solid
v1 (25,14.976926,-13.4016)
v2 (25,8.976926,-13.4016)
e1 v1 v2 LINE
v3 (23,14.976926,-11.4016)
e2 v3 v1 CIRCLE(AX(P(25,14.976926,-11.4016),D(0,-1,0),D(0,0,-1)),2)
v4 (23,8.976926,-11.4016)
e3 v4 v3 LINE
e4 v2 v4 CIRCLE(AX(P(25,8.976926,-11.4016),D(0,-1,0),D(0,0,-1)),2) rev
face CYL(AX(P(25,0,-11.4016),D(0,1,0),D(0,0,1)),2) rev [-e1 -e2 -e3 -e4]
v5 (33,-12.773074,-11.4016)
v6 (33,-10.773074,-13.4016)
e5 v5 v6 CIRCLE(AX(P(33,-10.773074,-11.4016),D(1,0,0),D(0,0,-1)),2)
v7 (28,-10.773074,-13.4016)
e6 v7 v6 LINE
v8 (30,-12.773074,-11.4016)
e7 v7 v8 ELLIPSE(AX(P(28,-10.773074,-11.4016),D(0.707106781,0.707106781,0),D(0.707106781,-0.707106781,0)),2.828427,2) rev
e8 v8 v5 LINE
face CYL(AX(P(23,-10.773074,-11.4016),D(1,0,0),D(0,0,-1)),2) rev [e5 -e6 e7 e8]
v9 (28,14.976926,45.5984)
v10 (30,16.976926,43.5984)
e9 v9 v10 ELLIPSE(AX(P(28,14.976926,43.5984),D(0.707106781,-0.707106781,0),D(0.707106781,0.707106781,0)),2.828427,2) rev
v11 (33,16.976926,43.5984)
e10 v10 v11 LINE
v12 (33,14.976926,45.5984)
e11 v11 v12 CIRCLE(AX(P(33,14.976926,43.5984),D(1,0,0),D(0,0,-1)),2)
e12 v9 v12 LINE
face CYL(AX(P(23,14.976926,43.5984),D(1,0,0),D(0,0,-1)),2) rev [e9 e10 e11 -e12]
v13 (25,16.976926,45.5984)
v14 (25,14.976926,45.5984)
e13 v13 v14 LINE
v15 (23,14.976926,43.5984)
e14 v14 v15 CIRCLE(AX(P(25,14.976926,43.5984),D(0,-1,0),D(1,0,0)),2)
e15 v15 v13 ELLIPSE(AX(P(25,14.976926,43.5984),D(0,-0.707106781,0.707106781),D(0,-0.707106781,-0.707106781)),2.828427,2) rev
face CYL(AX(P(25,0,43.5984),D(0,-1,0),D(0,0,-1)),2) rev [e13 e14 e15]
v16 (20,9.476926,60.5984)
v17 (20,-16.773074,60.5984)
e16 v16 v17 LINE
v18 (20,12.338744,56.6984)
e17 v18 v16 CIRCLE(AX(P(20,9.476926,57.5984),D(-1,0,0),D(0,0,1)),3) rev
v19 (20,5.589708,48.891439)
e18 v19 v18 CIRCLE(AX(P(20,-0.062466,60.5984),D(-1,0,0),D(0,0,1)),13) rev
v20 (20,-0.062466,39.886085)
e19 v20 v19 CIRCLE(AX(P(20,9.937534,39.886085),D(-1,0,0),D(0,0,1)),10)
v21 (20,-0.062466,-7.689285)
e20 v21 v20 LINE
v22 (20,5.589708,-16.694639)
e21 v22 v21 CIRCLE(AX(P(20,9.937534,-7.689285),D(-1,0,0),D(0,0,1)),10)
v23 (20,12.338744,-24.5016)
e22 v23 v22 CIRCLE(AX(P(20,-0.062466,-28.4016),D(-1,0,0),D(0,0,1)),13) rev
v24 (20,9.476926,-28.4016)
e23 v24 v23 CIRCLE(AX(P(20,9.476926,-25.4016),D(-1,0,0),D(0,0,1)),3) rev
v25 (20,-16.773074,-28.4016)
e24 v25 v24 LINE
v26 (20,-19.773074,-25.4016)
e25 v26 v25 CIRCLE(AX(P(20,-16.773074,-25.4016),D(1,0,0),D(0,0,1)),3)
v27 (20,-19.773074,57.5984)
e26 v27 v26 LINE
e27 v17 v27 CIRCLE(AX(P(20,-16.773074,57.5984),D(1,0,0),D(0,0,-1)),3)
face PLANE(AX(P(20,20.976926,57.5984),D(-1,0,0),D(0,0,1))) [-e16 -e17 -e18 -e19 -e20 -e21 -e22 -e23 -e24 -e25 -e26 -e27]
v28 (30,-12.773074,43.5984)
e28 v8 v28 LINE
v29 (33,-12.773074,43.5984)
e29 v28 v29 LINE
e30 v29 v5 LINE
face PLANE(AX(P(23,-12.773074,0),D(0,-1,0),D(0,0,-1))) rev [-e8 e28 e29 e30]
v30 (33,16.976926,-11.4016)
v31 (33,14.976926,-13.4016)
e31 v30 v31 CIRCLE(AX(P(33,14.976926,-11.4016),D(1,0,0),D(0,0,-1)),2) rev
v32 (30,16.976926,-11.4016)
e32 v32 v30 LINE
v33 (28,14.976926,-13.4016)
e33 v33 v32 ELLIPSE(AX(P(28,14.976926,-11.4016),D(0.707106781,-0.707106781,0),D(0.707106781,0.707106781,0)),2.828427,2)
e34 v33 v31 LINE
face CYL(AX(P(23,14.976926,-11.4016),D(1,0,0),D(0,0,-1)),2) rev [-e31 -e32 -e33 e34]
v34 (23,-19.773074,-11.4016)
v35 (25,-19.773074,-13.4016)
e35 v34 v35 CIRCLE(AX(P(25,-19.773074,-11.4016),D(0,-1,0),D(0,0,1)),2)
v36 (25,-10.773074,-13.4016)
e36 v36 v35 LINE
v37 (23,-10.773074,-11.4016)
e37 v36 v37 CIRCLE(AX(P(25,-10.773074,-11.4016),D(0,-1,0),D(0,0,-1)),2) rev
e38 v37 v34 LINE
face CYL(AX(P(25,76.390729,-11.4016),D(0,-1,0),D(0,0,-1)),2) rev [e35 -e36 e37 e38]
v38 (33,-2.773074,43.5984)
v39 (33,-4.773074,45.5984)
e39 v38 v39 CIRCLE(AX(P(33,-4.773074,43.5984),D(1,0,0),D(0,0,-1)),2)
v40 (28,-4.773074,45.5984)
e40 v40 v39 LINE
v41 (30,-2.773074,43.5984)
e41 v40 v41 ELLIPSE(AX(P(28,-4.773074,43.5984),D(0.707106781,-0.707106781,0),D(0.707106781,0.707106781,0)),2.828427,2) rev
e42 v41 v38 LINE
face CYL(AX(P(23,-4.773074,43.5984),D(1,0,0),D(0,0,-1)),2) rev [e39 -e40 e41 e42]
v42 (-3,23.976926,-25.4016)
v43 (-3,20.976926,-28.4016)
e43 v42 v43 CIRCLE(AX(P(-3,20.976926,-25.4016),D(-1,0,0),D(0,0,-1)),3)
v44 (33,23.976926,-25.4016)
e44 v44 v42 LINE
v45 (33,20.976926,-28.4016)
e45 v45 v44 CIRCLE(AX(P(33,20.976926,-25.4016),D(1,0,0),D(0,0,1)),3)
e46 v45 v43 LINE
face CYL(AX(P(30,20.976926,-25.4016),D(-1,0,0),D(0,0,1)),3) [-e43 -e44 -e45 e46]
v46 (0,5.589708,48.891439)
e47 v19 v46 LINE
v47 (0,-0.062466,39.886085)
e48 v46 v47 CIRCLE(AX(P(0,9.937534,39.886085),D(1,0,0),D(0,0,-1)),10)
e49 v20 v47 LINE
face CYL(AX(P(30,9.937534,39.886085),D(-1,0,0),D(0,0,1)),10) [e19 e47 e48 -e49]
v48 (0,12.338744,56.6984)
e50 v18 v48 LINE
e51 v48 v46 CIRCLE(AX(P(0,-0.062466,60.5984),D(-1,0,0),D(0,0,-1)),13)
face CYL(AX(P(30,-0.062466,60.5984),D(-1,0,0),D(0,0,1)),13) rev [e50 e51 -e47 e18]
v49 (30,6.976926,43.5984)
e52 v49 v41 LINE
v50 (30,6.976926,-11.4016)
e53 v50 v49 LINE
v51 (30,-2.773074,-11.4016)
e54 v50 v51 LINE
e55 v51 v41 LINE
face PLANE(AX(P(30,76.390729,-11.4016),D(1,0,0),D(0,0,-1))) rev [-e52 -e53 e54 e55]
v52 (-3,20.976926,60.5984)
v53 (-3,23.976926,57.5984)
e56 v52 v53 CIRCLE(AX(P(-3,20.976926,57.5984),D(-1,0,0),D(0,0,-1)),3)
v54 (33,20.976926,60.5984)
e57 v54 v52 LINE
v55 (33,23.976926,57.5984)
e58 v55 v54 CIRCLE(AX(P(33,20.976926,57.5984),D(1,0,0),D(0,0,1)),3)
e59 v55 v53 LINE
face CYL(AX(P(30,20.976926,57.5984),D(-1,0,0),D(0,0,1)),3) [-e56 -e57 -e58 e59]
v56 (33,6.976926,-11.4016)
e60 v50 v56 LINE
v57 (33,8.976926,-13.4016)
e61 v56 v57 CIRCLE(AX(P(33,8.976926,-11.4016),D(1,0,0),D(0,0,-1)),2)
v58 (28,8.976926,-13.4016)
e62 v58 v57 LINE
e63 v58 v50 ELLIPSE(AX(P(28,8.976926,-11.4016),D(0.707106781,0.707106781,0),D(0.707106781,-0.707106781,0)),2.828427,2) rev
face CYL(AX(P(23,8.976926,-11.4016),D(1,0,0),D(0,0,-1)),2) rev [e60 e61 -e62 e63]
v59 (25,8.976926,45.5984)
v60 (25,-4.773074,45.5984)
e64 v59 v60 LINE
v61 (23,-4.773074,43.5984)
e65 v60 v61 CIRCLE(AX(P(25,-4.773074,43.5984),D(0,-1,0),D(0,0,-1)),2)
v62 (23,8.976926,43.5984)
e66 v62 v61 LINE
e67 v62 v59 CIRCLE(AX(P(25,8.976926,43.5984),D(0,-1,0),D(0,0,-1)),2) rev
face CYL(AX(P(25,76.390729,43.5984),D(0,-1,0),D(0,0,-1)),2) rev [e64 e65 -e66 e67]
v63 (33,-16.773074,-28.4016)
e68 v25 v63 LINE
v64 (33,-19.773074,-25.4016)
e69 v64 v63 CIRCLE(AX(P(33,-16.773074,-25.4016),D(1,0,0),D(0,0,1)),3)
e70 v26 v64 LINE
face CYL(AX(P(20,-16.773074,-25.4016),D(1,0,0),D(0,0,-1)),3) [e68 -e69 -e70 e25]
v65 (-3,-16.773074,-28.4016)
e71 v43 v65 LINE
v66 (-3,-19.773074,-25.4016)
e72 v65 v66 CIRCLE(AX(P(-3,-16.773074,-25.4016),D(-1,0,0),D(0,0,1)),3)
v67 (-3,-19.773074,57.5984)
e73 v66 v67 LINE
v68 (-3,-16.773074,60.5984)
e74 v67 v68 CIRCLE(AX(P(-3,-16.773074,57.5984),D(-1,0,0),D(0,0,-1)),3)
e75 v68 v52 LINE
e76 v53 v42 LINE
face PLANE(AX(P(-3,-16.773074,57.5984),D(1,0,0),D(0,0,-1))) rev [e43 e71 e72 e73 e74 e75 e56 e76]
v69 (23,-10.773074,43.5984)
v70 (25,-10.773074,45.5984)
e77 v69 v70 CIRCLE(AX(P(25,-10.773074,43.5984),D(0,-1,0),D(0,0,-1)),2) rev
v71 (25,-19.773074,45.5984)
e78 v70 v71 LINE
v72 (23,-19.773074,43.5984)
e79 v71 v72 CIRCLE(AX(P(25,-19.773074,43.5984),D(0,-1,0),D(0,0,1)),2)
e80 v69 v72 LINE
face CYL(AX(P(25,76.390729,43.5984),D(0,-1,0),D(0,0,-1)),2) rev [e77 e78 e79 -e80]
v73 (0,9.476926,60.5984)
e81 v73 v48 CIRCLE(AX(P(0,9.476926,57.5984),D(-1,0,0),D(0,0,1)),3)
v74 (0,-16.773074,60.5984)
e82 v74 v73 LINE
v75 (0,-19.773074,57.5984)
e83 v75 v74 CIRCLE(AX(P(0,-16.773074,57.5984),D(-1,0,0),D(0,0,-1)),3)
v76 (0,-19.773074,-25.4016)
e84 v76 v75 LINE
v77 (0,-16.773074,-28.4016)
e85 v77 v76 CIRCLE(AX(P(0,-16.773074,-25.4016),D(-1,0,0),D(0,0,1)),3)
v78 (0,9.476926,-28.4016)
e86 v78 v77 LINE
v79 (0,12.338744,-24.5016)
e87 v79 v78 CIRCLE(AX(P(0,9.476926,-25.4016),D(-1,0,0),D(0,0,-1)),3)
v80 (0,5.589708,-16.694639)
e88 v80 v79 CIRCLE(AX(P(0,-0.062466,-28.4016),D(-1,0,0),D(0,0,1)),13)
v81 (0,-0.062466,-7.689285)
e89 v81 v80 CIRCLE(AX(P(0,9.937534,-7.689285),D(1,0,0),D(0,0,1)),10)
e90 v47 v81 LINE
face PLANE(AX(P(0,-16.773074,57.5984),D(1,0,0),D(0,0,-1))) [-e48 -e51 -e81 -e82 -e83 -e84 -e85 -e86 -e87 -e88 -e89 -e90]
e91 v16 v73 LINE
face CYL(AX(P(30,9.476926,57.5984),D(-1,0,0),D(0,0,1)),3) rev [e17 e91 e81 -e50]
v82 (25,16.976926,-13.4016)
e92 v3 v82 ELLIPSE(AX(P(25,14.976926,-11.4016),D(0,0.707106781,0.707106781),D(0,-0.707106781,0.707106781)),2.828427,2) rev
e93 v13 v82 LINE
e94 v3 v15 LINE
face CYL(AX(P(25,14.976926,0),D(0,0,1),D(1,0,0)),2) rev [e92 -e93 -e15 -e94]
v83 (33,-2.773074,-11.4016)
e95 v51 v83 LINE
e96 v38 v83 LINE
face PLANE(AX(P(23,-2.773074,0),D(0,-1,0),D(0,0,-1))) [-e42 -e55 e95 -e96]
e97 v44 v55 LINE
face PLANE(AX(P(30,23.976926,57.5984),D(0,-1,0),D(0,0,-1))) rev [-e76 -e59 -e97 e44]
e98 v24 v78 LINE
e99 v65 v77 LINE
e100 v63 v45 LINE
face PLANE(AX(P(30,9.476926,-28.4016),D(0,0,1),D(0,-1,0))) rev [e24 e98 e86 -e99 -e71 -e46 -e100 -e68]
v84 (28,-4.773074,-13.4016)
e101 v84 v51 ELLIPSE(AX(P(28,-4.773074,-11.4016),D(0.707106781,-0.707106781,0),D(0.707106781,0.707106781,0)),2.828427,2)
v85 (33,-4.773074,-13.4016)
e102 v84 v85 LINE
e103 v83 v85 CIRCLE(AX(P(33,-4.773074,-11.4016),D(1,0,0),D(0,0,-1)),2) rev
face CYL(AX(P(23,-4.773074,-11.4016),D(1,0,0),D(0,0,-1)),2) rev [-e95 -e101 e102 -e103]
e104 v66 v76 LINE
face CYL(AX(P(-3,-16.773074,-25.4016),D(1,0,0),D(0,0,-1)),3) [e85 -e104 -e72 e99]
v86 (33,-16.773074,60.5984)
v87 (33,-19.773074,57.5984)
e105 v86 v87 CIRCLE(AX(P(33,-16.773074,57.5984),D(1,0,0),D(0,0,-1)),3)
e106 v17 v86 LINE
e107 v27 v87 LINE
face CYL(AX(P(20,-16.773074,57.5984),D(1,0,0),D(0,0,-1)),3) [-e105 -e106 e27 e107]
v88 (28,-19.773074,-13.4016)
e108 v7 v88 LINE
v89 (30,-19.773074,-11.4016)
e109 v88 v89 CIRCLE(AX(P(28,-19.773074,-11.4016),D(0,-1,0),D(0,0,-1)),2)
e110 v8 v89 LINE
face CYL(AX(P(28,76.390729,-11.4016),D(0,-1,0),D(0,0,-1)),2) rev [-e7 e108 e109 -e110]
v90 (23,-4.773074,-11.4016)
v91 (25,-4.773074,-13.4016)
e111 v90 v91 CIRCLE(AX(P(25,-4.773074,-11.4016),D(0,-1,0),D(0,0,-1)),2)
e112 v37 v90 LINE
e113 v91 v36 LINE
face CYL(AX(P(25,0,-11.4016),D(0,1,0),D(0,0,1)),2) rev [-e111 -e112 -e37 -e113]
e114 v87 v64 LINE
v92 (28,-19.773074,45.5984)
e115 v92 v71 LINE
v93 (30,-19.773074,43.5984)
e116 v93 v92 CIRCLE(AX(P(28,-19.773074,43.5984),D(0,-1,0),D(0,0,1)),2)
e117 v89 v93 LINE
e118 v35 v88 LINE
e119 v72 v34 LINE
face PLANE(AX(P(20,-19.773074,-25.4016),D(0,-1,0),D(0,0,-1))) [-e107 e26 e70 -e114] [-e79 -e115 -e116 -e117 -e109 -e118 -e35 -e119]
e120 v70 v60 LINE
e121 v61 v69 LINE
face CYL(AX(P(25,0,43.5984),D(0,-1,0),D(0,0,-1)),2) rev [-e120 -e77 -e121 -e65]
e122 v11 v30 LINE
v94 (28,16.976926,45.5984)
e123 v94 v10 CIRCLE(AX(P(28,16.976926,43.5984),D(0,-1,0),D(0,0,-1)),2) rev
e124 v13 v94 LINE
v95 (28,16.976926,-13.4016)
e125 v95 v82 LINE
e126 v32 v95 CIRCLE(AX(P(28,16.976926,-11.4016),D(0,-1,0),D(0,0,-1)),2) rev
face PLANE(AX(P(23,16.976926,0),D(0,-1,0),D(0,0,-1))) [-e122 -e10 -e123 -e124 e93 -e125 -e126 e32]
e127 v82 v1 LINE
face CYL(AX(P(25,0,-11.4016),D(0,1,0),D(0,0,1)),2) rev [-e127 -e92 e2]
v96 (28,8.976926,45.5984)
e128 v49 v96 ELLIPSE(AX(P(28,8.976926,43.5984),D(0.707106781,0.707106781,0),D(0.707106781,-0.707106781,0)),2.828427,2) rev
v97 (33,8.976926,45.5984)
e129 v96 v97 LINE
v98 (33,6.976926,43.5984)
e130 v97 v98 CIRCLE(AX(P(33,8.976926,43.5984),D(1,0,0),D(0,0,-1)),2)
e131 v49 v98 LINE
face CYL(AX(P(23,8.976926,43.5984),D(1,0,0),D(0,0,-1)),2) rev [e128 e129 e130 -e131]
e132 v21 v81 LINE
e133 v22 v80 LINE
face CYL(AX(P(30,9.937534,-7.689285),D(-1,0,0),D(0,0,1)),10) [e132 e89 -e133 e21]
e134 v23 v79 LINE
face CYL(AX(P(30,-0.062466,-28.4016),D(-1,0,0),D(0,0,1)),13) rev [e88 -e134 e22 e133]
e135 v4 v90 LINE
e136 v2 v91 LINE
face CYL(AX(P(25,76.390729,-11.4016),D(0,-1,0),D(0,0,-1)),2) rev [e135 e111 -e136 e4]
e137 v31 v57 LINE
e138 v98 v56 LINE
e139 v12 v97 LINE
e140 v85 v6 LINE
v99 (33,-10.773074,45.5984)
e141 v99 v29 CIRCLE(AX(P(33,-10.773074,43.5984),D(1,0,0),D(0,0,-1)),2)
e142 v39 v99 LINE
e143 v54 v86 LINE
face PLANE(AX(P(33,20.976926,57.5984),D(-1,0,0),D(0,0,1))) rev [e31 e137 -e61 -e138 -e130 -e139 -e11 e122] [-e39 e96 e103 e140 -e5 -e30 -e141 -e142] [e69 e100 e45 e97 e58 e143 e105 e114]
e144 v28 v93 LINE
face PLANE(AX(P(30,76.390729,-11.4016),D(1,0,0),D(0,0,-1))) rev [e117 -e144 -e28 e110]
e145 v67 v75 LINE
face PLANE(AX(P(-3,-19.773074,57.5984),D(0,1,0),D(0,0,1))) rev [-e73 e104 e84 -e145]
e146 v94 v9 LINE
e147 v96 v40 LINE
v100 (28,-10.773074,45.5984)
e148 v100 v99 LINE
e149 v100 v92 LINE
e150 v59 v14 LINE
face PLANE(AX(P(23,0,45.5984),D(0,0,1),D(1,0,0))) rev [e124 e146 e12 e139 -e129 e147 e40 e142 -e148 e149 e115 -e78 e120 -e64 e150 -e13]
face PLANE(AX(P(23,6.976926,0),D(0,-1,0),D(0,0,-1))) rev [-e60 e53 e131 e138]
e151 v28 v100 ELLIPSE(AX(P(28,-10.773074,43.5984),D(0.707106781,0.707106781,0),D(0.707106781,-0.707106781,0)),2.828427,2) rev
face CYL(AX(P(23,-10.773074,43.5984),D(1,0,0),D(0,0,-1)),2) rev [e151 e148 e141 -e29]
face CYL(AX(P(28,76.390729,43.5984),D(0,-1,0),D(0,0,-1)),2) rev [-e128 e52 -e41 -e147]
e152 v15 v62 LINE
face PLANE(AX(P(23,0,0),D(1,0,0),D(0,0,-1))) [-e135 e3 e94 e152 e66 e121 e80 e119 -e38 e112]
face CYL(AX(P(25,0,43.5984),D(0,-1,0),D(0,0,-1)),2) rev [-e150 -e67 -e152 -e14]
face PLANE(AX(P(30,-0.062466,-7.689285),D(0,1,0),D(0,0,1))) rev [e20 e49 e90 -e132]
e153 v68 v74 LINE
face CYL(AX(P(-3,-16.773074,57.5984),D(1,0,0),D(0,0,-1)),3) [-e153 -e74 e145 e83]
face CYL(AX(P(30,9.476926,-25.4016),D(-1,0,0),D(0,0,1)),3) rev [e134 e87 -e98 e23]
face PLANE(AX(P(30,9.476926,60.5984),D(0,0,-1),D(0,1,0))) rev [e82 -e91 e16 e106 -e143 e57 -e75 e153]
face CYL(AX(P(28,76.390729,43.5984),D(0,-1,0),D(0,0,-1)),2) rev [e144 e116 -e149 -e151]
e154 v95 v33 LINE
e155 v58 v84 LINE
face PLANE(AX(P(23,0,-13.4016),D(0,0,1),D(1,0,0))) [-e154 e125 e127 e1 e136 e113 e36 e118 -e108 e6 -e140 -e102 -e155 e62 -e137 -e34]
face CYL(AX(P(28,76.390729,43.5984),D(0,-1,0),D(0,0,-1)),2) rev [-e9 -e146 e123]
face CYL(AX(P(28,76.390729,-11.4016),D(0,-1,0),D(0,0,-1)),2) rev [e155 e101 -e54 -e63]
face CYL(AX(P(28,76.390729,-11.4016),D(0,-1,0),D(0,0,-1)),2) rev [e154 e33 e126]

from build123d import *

# Parameters (mm, degrees)
RESSALTO_EXTRUS_O2_DEPTH      = 30
RESSALTO_EXTRUS_O3_START      = 3
RESSALTO_EXTRUS_O3_DEPTH      = 3
RESSALTO_EXTRUS_O4_DEPTH      = 3
RESSALTO_EXTRUS_O4_DEPTH_BACK = 10
CORTE_EXTRUS_O1_DEPTH         = 10
CORTE_EXTRUS_O2_REACH         = 83.702
FILETE1_START                 = -19.773073923
FILETE1_DEPTH                 = 36.75
FILETE1_START_2               = -13.40159992
FILETE1_2_DEPTH               = 59


with BuildPart() as part:
    # Esboço2 → Ressalto-extrusão2 (new body)
    with BuildSketch(Plane(origin=(0, 0, 0), x_dir=(0, 0, -1), z_dir=(1, 0, 0))):
        with BuildLine():
            Line((2.90159992, -0.062465938), (-35.09840008, -0.062465938))
            Line((-35.09840008, -0.062465938), (-39.886084903, -0.062465938))
            ThreePointArc((-39.886084903, -0.062465938), (-45.202180234, 1.467638524), (-48.891439328, 5.589707975))
            ThreePointArc((-48.891439328, 5.589707975), (-52.096536948, 9.772081499), (-56.69840008, 12.338743681))
            ThreePointArc((-56.69840008, 12.338743681), (-59.373224015, 11.895603401), (-60.59840008, 9.476926077))
            Line((-60.59840008, 9.476926077), (-60.59840008, 20.976926077))
            ThreePointArc((-60.59840008, 20.976926077), (-59.719720424, 23.09824642), (-57.59840008, 23.976926077))
            Line((-57.59840008, 23.976926077), (25.40159992, 23.976926077))
            ThreePointArc((25.40159992, 23.976926077), (27.522920263, 23.09824642), (28.40159992, 20.976926077))
            Line((28.40159992, 20.976926077), (28.40159992, 9.476926077))
            ThreePointArc((28.40159992, 9.476926077), (27.176423855, 11.895603401), (24.50159992, 12.338743681))
            ThreePointArc((24.50159992, 12.338743681), (19.899736788, 9.772081499), (16.694639168, 5.589707975))
            ThreePointArc((16.694639168, 5.589707975), (13.005380073, 1.467638524), (7.689284743, -0.062465938))
            Line((7.689284743, -0.062465938), (2.90159992, -0.062465938))
        make_face()
    extrude(amount=RESSALTO_EXTRUS_O2_DEPTH)

    # Esboço3 → Ressalto-extrusão3 (add)
    with BuildSketch(Plane.ZY.offset(RESSALTO_EXTRUS_O3_START)):
        with BuildLine():
            Line((60.59840008, 15.226926077), (60.59840008, 20.976926077))
            ThreePointArc((60.59840008, 20.976926077), (59.719720424, 23.09824642), (57.59840008, 23.976926077))
            Line((57.59840008, 23.976926077), (16.09840008, 23.976926077))
            Line((16.09840008, 23.976926077), (-25.40159992, 23.976926077))
            ThreePointArc((-25.40159992, 23.976926077), (-27.522920263, 23.09824642), (-28.40159992, 20.976926077))
            Line((-28.40159992, 20.976926077), (-28.40159992, 15.226926077))
            Line((-28.40159992, 15.226926077), (-28.40159992, -16.773073923))
            ThreePointArc((-28.40159992, -16.773073923), (-27.522920263, -18.894394267), (-25.40159992, -19.773073923))
            Line((-25.40159992, -19.773073923), (57.59840008, -19.773073923))
            ThreePointArc((57.59840008, -19.773073923), (59.719720424, -18.894394267), (60.59840008, -16.773073923))
            Line((60.59840008, -16.773073923), (60.59840008, 15.226926077))
        make_face()
    extrude(amount=-RESSALTO_EXTRUS_O3_DEPTH)

    # Esboço4 → Ressalto-extrusão4 (add, two sides: drawn at the far end of the back side and taken through both)
    with BuildSketch(Plane(origin=(30, 0, 0), x_dir=(0, 0, -1), z_dir=(1, 0, 0)).offset(-RESSALTO_EXTRUS_O4_DEPTH_BACK)):
        with BuildLine():
            Line((-16.09840008, 23.976926077), (25.40159992, 23.976926077))
            ThreePointArc((25.40159992, 23.976926077), (27.522920263, 23.09824642), (28.40159992, 20.976926077))
            Line((28.40159992, 20.976926077), (28.40159992, 15.226926077))
            Line((28.40159992, 15.226926077), (28.40159992, -16.773073923))
            ThreePointArc((28.40159992, -16.773073923), (27.522920263, -18.894394267), (25.40159992, -19.773073923))
            Line((25.40159992, -19.773073923), (-57.59840008, -19.773073923))
            ThreePointArc((-57.59840008, -19.773073923), (-59.719720424, -18.894394267), (-60.59840008, -16.773073923))
            Line((-60.59840008, -16.773073923), (-60.59840008, 15.226926077))
            Line((-60.59840008, 15.226926077), (-60.59840008, 20.976926077))
            ThreePointArc((-60.59840008, 20.976926077), (-59.719720424, 23.09824642), (-57.59840008, 23.976926077))
            Line((-57.59840008, 23.976926077), (-16.09840008, 23.976926077))
        make_face()
    extrude(amount=RESSALTO_EXTRUS_O4_DEPTH + RESSALTO_EXTRUS_O4_DEPTH_BACK)

    # Esboço8 → Corte-extrusão1 (cut)
    with BuildSketch(Plane(origin=(33, 0, 0), x_dir=(0, 0, -1), z_dir=(1, 0, 0))):
        with BuildLine():
            Line((-43.59840008, -2.773073923), (11.40159992, -2.773073923))
            ThreePointArc((11.40159992, -2.773073923), (12.815813482, -3.358860361), (13.40159992, -4.773073923))
            Line((13.40159992, -4.773073923), (13.40159992, -10.773073923))
            ThreePointArc((13.40159992, -10.773073923), (12.815813482, -12.187287486), (11.40159992, -12.773073923))
            Line((11.40159992, -12.773073923), (-43.59840008, -12.773073923))
            ThreePointArc((-43.59840008, -12.773073923), (-45.012613643, -12.187287486), (-45.59840008, -10.773073923))
            Line((-45.59840008, -10.773073923), (-45.59840008, -4.773073923))
            ThreePointArc((-45.59840008, -4.773073923), (-45.012613643, -3.358860361), (-43.59840008, -2.773073923))
        make_face()
        with BuildLine():
            Line((-43.59840008, 6.976926077), (11.40159992, 6.976926077))
            ThreePointArc((11.40159992, 6.976926077), (12.815813482, 7.562712514), (13.40159992, 8.976926077))
            Line((13.40159992, 8.976926077), (13.40159992, 14.976926077))
            ThreePointArc((13.40159992, 14.976926077), (12.815813482, 16.391139639), (11.40159992, 16.976926077))
            Line((11.40159992, 16.976926077), (-43.59840008, 16.976926077))
            ThreePointArc((-43.59840008, 16.976926077), (-45.012613643, 16.391139639), (-45.59840008, 14.976926077))
            Line((-45.59840008, 14.976926077), (-45.59840008, 8.976926077))
            ThreePointArc((-45.59840008, 8.976926077), (-45.012613643, 7.562712514), (-43.59840008, 6.976926077))
        make_face()
    extrude(amount=-CORTE_EXTRUS_O1_DEPTH, mode=Mode.SUBTRACT)

    # Corte-extrusão2: up to this face of the body (flat: up to its plane)
    corte_extrus_o2_end = Plane(part.part.faces().sort_by_distance((28, 16.976926077, 16.09840008))[0])
    # Esboço9 → Corte-extrusão2 (cut, up to the picked face)
    with BuildSketch(Plane(origin=(0, -19.773073923, 0), x_dir=(-1, 0, 0), z_dir=(0, -1, 0)), mode=Mode.PRIVATE) as corte_extrus_o2_sk1:
        with BuildLine():
            Line((-25, 13.40159992), (-28, 13.40159992))
            ThreePointArc((-28, 13.40159992), (-29.414213562, 12.815813482), (-30, 11.40159992))
            Line((-30, 11.40159992), (-30, -43.59840008))
            ThreePointArc((-30, -43.59840008), (-29.414213562, -45.012613643), (-28, -45.59840008))
            Line((-28, -45.59840008), (-25, -45.59840008))
            ThreePointArc((-25, -45.59840008), (-23.585786438, -45.012613643), (-23, -43.59840008))
            Line((-23, -43.59840008), (-23, 11.40159992))
            ThreePointArc((-23, 11.40159992), (-23.585786438, 12.815813482), (-25, 13.40159992))
        make_face()
    corte_extrus_o2_tool1 = split(extrude(corte_extrus_o2_sk1.sketch, amount=-CORTE_EXTRUS_O2_REACH, mode=Mode.PRIVATE), bisect_by=corte_extrus_o2_end, keep=Keep.BOTH, mode=Mode.PRIVATE)
    add(corte_extrus_o2_tool1.solids().sort_by(Axis((26.5, -19.773074, 16.0984), (0, 1, 0)))[0], mode=Mode.SUBTRACT)

    # Filete1: read off the stored shape, not the designer's step
    # Filete1 outline → Filete1 (add)
    with BuildSketch(Plane(origin=(0, 0, 0), x_dir=(1, 0, 0), z_dir=(0, 1, 0)).offset(FILETE1_START)):
        with BuildLine():
            ThreePointArc((25, -45.59840008), (23.585786437, -45.012613642), (23, -43.59840008))
            Line((23, -43.59840008), (23, -45.59840008))
            Line((23, -45.59840008), (25, -45.59840008))
        make_face()
        with BuildLine():
            ThreePointArc((23, 11.40159992), (23.585786438, 12.815813482), (25, 13.40159992))
            Line((25, 13.40159992), (23, 13.40159992))
            Line((23, 13.40159992), (23, 11.40159992))
        make_face()
    extrude(amount=FILETE1_DEPTH)

    # Filete1 2 outline → Filete1 2 (add)
    with BuildSketch(Plane.XY.offset(FILETE1_START_2)):
        with BuildLine():
            ThreePointArc((23, 14.976926077), (23.585786438, 16.391139639), (25, 16.976926077))
            Line((25, 16.976926077), (23, 16.976926077))
            Line((23, 16.976926077), (23, 14.976926077))
        make_face()
    extrude(amount=FILETE1_2_DEPTH)


solid = part.part
